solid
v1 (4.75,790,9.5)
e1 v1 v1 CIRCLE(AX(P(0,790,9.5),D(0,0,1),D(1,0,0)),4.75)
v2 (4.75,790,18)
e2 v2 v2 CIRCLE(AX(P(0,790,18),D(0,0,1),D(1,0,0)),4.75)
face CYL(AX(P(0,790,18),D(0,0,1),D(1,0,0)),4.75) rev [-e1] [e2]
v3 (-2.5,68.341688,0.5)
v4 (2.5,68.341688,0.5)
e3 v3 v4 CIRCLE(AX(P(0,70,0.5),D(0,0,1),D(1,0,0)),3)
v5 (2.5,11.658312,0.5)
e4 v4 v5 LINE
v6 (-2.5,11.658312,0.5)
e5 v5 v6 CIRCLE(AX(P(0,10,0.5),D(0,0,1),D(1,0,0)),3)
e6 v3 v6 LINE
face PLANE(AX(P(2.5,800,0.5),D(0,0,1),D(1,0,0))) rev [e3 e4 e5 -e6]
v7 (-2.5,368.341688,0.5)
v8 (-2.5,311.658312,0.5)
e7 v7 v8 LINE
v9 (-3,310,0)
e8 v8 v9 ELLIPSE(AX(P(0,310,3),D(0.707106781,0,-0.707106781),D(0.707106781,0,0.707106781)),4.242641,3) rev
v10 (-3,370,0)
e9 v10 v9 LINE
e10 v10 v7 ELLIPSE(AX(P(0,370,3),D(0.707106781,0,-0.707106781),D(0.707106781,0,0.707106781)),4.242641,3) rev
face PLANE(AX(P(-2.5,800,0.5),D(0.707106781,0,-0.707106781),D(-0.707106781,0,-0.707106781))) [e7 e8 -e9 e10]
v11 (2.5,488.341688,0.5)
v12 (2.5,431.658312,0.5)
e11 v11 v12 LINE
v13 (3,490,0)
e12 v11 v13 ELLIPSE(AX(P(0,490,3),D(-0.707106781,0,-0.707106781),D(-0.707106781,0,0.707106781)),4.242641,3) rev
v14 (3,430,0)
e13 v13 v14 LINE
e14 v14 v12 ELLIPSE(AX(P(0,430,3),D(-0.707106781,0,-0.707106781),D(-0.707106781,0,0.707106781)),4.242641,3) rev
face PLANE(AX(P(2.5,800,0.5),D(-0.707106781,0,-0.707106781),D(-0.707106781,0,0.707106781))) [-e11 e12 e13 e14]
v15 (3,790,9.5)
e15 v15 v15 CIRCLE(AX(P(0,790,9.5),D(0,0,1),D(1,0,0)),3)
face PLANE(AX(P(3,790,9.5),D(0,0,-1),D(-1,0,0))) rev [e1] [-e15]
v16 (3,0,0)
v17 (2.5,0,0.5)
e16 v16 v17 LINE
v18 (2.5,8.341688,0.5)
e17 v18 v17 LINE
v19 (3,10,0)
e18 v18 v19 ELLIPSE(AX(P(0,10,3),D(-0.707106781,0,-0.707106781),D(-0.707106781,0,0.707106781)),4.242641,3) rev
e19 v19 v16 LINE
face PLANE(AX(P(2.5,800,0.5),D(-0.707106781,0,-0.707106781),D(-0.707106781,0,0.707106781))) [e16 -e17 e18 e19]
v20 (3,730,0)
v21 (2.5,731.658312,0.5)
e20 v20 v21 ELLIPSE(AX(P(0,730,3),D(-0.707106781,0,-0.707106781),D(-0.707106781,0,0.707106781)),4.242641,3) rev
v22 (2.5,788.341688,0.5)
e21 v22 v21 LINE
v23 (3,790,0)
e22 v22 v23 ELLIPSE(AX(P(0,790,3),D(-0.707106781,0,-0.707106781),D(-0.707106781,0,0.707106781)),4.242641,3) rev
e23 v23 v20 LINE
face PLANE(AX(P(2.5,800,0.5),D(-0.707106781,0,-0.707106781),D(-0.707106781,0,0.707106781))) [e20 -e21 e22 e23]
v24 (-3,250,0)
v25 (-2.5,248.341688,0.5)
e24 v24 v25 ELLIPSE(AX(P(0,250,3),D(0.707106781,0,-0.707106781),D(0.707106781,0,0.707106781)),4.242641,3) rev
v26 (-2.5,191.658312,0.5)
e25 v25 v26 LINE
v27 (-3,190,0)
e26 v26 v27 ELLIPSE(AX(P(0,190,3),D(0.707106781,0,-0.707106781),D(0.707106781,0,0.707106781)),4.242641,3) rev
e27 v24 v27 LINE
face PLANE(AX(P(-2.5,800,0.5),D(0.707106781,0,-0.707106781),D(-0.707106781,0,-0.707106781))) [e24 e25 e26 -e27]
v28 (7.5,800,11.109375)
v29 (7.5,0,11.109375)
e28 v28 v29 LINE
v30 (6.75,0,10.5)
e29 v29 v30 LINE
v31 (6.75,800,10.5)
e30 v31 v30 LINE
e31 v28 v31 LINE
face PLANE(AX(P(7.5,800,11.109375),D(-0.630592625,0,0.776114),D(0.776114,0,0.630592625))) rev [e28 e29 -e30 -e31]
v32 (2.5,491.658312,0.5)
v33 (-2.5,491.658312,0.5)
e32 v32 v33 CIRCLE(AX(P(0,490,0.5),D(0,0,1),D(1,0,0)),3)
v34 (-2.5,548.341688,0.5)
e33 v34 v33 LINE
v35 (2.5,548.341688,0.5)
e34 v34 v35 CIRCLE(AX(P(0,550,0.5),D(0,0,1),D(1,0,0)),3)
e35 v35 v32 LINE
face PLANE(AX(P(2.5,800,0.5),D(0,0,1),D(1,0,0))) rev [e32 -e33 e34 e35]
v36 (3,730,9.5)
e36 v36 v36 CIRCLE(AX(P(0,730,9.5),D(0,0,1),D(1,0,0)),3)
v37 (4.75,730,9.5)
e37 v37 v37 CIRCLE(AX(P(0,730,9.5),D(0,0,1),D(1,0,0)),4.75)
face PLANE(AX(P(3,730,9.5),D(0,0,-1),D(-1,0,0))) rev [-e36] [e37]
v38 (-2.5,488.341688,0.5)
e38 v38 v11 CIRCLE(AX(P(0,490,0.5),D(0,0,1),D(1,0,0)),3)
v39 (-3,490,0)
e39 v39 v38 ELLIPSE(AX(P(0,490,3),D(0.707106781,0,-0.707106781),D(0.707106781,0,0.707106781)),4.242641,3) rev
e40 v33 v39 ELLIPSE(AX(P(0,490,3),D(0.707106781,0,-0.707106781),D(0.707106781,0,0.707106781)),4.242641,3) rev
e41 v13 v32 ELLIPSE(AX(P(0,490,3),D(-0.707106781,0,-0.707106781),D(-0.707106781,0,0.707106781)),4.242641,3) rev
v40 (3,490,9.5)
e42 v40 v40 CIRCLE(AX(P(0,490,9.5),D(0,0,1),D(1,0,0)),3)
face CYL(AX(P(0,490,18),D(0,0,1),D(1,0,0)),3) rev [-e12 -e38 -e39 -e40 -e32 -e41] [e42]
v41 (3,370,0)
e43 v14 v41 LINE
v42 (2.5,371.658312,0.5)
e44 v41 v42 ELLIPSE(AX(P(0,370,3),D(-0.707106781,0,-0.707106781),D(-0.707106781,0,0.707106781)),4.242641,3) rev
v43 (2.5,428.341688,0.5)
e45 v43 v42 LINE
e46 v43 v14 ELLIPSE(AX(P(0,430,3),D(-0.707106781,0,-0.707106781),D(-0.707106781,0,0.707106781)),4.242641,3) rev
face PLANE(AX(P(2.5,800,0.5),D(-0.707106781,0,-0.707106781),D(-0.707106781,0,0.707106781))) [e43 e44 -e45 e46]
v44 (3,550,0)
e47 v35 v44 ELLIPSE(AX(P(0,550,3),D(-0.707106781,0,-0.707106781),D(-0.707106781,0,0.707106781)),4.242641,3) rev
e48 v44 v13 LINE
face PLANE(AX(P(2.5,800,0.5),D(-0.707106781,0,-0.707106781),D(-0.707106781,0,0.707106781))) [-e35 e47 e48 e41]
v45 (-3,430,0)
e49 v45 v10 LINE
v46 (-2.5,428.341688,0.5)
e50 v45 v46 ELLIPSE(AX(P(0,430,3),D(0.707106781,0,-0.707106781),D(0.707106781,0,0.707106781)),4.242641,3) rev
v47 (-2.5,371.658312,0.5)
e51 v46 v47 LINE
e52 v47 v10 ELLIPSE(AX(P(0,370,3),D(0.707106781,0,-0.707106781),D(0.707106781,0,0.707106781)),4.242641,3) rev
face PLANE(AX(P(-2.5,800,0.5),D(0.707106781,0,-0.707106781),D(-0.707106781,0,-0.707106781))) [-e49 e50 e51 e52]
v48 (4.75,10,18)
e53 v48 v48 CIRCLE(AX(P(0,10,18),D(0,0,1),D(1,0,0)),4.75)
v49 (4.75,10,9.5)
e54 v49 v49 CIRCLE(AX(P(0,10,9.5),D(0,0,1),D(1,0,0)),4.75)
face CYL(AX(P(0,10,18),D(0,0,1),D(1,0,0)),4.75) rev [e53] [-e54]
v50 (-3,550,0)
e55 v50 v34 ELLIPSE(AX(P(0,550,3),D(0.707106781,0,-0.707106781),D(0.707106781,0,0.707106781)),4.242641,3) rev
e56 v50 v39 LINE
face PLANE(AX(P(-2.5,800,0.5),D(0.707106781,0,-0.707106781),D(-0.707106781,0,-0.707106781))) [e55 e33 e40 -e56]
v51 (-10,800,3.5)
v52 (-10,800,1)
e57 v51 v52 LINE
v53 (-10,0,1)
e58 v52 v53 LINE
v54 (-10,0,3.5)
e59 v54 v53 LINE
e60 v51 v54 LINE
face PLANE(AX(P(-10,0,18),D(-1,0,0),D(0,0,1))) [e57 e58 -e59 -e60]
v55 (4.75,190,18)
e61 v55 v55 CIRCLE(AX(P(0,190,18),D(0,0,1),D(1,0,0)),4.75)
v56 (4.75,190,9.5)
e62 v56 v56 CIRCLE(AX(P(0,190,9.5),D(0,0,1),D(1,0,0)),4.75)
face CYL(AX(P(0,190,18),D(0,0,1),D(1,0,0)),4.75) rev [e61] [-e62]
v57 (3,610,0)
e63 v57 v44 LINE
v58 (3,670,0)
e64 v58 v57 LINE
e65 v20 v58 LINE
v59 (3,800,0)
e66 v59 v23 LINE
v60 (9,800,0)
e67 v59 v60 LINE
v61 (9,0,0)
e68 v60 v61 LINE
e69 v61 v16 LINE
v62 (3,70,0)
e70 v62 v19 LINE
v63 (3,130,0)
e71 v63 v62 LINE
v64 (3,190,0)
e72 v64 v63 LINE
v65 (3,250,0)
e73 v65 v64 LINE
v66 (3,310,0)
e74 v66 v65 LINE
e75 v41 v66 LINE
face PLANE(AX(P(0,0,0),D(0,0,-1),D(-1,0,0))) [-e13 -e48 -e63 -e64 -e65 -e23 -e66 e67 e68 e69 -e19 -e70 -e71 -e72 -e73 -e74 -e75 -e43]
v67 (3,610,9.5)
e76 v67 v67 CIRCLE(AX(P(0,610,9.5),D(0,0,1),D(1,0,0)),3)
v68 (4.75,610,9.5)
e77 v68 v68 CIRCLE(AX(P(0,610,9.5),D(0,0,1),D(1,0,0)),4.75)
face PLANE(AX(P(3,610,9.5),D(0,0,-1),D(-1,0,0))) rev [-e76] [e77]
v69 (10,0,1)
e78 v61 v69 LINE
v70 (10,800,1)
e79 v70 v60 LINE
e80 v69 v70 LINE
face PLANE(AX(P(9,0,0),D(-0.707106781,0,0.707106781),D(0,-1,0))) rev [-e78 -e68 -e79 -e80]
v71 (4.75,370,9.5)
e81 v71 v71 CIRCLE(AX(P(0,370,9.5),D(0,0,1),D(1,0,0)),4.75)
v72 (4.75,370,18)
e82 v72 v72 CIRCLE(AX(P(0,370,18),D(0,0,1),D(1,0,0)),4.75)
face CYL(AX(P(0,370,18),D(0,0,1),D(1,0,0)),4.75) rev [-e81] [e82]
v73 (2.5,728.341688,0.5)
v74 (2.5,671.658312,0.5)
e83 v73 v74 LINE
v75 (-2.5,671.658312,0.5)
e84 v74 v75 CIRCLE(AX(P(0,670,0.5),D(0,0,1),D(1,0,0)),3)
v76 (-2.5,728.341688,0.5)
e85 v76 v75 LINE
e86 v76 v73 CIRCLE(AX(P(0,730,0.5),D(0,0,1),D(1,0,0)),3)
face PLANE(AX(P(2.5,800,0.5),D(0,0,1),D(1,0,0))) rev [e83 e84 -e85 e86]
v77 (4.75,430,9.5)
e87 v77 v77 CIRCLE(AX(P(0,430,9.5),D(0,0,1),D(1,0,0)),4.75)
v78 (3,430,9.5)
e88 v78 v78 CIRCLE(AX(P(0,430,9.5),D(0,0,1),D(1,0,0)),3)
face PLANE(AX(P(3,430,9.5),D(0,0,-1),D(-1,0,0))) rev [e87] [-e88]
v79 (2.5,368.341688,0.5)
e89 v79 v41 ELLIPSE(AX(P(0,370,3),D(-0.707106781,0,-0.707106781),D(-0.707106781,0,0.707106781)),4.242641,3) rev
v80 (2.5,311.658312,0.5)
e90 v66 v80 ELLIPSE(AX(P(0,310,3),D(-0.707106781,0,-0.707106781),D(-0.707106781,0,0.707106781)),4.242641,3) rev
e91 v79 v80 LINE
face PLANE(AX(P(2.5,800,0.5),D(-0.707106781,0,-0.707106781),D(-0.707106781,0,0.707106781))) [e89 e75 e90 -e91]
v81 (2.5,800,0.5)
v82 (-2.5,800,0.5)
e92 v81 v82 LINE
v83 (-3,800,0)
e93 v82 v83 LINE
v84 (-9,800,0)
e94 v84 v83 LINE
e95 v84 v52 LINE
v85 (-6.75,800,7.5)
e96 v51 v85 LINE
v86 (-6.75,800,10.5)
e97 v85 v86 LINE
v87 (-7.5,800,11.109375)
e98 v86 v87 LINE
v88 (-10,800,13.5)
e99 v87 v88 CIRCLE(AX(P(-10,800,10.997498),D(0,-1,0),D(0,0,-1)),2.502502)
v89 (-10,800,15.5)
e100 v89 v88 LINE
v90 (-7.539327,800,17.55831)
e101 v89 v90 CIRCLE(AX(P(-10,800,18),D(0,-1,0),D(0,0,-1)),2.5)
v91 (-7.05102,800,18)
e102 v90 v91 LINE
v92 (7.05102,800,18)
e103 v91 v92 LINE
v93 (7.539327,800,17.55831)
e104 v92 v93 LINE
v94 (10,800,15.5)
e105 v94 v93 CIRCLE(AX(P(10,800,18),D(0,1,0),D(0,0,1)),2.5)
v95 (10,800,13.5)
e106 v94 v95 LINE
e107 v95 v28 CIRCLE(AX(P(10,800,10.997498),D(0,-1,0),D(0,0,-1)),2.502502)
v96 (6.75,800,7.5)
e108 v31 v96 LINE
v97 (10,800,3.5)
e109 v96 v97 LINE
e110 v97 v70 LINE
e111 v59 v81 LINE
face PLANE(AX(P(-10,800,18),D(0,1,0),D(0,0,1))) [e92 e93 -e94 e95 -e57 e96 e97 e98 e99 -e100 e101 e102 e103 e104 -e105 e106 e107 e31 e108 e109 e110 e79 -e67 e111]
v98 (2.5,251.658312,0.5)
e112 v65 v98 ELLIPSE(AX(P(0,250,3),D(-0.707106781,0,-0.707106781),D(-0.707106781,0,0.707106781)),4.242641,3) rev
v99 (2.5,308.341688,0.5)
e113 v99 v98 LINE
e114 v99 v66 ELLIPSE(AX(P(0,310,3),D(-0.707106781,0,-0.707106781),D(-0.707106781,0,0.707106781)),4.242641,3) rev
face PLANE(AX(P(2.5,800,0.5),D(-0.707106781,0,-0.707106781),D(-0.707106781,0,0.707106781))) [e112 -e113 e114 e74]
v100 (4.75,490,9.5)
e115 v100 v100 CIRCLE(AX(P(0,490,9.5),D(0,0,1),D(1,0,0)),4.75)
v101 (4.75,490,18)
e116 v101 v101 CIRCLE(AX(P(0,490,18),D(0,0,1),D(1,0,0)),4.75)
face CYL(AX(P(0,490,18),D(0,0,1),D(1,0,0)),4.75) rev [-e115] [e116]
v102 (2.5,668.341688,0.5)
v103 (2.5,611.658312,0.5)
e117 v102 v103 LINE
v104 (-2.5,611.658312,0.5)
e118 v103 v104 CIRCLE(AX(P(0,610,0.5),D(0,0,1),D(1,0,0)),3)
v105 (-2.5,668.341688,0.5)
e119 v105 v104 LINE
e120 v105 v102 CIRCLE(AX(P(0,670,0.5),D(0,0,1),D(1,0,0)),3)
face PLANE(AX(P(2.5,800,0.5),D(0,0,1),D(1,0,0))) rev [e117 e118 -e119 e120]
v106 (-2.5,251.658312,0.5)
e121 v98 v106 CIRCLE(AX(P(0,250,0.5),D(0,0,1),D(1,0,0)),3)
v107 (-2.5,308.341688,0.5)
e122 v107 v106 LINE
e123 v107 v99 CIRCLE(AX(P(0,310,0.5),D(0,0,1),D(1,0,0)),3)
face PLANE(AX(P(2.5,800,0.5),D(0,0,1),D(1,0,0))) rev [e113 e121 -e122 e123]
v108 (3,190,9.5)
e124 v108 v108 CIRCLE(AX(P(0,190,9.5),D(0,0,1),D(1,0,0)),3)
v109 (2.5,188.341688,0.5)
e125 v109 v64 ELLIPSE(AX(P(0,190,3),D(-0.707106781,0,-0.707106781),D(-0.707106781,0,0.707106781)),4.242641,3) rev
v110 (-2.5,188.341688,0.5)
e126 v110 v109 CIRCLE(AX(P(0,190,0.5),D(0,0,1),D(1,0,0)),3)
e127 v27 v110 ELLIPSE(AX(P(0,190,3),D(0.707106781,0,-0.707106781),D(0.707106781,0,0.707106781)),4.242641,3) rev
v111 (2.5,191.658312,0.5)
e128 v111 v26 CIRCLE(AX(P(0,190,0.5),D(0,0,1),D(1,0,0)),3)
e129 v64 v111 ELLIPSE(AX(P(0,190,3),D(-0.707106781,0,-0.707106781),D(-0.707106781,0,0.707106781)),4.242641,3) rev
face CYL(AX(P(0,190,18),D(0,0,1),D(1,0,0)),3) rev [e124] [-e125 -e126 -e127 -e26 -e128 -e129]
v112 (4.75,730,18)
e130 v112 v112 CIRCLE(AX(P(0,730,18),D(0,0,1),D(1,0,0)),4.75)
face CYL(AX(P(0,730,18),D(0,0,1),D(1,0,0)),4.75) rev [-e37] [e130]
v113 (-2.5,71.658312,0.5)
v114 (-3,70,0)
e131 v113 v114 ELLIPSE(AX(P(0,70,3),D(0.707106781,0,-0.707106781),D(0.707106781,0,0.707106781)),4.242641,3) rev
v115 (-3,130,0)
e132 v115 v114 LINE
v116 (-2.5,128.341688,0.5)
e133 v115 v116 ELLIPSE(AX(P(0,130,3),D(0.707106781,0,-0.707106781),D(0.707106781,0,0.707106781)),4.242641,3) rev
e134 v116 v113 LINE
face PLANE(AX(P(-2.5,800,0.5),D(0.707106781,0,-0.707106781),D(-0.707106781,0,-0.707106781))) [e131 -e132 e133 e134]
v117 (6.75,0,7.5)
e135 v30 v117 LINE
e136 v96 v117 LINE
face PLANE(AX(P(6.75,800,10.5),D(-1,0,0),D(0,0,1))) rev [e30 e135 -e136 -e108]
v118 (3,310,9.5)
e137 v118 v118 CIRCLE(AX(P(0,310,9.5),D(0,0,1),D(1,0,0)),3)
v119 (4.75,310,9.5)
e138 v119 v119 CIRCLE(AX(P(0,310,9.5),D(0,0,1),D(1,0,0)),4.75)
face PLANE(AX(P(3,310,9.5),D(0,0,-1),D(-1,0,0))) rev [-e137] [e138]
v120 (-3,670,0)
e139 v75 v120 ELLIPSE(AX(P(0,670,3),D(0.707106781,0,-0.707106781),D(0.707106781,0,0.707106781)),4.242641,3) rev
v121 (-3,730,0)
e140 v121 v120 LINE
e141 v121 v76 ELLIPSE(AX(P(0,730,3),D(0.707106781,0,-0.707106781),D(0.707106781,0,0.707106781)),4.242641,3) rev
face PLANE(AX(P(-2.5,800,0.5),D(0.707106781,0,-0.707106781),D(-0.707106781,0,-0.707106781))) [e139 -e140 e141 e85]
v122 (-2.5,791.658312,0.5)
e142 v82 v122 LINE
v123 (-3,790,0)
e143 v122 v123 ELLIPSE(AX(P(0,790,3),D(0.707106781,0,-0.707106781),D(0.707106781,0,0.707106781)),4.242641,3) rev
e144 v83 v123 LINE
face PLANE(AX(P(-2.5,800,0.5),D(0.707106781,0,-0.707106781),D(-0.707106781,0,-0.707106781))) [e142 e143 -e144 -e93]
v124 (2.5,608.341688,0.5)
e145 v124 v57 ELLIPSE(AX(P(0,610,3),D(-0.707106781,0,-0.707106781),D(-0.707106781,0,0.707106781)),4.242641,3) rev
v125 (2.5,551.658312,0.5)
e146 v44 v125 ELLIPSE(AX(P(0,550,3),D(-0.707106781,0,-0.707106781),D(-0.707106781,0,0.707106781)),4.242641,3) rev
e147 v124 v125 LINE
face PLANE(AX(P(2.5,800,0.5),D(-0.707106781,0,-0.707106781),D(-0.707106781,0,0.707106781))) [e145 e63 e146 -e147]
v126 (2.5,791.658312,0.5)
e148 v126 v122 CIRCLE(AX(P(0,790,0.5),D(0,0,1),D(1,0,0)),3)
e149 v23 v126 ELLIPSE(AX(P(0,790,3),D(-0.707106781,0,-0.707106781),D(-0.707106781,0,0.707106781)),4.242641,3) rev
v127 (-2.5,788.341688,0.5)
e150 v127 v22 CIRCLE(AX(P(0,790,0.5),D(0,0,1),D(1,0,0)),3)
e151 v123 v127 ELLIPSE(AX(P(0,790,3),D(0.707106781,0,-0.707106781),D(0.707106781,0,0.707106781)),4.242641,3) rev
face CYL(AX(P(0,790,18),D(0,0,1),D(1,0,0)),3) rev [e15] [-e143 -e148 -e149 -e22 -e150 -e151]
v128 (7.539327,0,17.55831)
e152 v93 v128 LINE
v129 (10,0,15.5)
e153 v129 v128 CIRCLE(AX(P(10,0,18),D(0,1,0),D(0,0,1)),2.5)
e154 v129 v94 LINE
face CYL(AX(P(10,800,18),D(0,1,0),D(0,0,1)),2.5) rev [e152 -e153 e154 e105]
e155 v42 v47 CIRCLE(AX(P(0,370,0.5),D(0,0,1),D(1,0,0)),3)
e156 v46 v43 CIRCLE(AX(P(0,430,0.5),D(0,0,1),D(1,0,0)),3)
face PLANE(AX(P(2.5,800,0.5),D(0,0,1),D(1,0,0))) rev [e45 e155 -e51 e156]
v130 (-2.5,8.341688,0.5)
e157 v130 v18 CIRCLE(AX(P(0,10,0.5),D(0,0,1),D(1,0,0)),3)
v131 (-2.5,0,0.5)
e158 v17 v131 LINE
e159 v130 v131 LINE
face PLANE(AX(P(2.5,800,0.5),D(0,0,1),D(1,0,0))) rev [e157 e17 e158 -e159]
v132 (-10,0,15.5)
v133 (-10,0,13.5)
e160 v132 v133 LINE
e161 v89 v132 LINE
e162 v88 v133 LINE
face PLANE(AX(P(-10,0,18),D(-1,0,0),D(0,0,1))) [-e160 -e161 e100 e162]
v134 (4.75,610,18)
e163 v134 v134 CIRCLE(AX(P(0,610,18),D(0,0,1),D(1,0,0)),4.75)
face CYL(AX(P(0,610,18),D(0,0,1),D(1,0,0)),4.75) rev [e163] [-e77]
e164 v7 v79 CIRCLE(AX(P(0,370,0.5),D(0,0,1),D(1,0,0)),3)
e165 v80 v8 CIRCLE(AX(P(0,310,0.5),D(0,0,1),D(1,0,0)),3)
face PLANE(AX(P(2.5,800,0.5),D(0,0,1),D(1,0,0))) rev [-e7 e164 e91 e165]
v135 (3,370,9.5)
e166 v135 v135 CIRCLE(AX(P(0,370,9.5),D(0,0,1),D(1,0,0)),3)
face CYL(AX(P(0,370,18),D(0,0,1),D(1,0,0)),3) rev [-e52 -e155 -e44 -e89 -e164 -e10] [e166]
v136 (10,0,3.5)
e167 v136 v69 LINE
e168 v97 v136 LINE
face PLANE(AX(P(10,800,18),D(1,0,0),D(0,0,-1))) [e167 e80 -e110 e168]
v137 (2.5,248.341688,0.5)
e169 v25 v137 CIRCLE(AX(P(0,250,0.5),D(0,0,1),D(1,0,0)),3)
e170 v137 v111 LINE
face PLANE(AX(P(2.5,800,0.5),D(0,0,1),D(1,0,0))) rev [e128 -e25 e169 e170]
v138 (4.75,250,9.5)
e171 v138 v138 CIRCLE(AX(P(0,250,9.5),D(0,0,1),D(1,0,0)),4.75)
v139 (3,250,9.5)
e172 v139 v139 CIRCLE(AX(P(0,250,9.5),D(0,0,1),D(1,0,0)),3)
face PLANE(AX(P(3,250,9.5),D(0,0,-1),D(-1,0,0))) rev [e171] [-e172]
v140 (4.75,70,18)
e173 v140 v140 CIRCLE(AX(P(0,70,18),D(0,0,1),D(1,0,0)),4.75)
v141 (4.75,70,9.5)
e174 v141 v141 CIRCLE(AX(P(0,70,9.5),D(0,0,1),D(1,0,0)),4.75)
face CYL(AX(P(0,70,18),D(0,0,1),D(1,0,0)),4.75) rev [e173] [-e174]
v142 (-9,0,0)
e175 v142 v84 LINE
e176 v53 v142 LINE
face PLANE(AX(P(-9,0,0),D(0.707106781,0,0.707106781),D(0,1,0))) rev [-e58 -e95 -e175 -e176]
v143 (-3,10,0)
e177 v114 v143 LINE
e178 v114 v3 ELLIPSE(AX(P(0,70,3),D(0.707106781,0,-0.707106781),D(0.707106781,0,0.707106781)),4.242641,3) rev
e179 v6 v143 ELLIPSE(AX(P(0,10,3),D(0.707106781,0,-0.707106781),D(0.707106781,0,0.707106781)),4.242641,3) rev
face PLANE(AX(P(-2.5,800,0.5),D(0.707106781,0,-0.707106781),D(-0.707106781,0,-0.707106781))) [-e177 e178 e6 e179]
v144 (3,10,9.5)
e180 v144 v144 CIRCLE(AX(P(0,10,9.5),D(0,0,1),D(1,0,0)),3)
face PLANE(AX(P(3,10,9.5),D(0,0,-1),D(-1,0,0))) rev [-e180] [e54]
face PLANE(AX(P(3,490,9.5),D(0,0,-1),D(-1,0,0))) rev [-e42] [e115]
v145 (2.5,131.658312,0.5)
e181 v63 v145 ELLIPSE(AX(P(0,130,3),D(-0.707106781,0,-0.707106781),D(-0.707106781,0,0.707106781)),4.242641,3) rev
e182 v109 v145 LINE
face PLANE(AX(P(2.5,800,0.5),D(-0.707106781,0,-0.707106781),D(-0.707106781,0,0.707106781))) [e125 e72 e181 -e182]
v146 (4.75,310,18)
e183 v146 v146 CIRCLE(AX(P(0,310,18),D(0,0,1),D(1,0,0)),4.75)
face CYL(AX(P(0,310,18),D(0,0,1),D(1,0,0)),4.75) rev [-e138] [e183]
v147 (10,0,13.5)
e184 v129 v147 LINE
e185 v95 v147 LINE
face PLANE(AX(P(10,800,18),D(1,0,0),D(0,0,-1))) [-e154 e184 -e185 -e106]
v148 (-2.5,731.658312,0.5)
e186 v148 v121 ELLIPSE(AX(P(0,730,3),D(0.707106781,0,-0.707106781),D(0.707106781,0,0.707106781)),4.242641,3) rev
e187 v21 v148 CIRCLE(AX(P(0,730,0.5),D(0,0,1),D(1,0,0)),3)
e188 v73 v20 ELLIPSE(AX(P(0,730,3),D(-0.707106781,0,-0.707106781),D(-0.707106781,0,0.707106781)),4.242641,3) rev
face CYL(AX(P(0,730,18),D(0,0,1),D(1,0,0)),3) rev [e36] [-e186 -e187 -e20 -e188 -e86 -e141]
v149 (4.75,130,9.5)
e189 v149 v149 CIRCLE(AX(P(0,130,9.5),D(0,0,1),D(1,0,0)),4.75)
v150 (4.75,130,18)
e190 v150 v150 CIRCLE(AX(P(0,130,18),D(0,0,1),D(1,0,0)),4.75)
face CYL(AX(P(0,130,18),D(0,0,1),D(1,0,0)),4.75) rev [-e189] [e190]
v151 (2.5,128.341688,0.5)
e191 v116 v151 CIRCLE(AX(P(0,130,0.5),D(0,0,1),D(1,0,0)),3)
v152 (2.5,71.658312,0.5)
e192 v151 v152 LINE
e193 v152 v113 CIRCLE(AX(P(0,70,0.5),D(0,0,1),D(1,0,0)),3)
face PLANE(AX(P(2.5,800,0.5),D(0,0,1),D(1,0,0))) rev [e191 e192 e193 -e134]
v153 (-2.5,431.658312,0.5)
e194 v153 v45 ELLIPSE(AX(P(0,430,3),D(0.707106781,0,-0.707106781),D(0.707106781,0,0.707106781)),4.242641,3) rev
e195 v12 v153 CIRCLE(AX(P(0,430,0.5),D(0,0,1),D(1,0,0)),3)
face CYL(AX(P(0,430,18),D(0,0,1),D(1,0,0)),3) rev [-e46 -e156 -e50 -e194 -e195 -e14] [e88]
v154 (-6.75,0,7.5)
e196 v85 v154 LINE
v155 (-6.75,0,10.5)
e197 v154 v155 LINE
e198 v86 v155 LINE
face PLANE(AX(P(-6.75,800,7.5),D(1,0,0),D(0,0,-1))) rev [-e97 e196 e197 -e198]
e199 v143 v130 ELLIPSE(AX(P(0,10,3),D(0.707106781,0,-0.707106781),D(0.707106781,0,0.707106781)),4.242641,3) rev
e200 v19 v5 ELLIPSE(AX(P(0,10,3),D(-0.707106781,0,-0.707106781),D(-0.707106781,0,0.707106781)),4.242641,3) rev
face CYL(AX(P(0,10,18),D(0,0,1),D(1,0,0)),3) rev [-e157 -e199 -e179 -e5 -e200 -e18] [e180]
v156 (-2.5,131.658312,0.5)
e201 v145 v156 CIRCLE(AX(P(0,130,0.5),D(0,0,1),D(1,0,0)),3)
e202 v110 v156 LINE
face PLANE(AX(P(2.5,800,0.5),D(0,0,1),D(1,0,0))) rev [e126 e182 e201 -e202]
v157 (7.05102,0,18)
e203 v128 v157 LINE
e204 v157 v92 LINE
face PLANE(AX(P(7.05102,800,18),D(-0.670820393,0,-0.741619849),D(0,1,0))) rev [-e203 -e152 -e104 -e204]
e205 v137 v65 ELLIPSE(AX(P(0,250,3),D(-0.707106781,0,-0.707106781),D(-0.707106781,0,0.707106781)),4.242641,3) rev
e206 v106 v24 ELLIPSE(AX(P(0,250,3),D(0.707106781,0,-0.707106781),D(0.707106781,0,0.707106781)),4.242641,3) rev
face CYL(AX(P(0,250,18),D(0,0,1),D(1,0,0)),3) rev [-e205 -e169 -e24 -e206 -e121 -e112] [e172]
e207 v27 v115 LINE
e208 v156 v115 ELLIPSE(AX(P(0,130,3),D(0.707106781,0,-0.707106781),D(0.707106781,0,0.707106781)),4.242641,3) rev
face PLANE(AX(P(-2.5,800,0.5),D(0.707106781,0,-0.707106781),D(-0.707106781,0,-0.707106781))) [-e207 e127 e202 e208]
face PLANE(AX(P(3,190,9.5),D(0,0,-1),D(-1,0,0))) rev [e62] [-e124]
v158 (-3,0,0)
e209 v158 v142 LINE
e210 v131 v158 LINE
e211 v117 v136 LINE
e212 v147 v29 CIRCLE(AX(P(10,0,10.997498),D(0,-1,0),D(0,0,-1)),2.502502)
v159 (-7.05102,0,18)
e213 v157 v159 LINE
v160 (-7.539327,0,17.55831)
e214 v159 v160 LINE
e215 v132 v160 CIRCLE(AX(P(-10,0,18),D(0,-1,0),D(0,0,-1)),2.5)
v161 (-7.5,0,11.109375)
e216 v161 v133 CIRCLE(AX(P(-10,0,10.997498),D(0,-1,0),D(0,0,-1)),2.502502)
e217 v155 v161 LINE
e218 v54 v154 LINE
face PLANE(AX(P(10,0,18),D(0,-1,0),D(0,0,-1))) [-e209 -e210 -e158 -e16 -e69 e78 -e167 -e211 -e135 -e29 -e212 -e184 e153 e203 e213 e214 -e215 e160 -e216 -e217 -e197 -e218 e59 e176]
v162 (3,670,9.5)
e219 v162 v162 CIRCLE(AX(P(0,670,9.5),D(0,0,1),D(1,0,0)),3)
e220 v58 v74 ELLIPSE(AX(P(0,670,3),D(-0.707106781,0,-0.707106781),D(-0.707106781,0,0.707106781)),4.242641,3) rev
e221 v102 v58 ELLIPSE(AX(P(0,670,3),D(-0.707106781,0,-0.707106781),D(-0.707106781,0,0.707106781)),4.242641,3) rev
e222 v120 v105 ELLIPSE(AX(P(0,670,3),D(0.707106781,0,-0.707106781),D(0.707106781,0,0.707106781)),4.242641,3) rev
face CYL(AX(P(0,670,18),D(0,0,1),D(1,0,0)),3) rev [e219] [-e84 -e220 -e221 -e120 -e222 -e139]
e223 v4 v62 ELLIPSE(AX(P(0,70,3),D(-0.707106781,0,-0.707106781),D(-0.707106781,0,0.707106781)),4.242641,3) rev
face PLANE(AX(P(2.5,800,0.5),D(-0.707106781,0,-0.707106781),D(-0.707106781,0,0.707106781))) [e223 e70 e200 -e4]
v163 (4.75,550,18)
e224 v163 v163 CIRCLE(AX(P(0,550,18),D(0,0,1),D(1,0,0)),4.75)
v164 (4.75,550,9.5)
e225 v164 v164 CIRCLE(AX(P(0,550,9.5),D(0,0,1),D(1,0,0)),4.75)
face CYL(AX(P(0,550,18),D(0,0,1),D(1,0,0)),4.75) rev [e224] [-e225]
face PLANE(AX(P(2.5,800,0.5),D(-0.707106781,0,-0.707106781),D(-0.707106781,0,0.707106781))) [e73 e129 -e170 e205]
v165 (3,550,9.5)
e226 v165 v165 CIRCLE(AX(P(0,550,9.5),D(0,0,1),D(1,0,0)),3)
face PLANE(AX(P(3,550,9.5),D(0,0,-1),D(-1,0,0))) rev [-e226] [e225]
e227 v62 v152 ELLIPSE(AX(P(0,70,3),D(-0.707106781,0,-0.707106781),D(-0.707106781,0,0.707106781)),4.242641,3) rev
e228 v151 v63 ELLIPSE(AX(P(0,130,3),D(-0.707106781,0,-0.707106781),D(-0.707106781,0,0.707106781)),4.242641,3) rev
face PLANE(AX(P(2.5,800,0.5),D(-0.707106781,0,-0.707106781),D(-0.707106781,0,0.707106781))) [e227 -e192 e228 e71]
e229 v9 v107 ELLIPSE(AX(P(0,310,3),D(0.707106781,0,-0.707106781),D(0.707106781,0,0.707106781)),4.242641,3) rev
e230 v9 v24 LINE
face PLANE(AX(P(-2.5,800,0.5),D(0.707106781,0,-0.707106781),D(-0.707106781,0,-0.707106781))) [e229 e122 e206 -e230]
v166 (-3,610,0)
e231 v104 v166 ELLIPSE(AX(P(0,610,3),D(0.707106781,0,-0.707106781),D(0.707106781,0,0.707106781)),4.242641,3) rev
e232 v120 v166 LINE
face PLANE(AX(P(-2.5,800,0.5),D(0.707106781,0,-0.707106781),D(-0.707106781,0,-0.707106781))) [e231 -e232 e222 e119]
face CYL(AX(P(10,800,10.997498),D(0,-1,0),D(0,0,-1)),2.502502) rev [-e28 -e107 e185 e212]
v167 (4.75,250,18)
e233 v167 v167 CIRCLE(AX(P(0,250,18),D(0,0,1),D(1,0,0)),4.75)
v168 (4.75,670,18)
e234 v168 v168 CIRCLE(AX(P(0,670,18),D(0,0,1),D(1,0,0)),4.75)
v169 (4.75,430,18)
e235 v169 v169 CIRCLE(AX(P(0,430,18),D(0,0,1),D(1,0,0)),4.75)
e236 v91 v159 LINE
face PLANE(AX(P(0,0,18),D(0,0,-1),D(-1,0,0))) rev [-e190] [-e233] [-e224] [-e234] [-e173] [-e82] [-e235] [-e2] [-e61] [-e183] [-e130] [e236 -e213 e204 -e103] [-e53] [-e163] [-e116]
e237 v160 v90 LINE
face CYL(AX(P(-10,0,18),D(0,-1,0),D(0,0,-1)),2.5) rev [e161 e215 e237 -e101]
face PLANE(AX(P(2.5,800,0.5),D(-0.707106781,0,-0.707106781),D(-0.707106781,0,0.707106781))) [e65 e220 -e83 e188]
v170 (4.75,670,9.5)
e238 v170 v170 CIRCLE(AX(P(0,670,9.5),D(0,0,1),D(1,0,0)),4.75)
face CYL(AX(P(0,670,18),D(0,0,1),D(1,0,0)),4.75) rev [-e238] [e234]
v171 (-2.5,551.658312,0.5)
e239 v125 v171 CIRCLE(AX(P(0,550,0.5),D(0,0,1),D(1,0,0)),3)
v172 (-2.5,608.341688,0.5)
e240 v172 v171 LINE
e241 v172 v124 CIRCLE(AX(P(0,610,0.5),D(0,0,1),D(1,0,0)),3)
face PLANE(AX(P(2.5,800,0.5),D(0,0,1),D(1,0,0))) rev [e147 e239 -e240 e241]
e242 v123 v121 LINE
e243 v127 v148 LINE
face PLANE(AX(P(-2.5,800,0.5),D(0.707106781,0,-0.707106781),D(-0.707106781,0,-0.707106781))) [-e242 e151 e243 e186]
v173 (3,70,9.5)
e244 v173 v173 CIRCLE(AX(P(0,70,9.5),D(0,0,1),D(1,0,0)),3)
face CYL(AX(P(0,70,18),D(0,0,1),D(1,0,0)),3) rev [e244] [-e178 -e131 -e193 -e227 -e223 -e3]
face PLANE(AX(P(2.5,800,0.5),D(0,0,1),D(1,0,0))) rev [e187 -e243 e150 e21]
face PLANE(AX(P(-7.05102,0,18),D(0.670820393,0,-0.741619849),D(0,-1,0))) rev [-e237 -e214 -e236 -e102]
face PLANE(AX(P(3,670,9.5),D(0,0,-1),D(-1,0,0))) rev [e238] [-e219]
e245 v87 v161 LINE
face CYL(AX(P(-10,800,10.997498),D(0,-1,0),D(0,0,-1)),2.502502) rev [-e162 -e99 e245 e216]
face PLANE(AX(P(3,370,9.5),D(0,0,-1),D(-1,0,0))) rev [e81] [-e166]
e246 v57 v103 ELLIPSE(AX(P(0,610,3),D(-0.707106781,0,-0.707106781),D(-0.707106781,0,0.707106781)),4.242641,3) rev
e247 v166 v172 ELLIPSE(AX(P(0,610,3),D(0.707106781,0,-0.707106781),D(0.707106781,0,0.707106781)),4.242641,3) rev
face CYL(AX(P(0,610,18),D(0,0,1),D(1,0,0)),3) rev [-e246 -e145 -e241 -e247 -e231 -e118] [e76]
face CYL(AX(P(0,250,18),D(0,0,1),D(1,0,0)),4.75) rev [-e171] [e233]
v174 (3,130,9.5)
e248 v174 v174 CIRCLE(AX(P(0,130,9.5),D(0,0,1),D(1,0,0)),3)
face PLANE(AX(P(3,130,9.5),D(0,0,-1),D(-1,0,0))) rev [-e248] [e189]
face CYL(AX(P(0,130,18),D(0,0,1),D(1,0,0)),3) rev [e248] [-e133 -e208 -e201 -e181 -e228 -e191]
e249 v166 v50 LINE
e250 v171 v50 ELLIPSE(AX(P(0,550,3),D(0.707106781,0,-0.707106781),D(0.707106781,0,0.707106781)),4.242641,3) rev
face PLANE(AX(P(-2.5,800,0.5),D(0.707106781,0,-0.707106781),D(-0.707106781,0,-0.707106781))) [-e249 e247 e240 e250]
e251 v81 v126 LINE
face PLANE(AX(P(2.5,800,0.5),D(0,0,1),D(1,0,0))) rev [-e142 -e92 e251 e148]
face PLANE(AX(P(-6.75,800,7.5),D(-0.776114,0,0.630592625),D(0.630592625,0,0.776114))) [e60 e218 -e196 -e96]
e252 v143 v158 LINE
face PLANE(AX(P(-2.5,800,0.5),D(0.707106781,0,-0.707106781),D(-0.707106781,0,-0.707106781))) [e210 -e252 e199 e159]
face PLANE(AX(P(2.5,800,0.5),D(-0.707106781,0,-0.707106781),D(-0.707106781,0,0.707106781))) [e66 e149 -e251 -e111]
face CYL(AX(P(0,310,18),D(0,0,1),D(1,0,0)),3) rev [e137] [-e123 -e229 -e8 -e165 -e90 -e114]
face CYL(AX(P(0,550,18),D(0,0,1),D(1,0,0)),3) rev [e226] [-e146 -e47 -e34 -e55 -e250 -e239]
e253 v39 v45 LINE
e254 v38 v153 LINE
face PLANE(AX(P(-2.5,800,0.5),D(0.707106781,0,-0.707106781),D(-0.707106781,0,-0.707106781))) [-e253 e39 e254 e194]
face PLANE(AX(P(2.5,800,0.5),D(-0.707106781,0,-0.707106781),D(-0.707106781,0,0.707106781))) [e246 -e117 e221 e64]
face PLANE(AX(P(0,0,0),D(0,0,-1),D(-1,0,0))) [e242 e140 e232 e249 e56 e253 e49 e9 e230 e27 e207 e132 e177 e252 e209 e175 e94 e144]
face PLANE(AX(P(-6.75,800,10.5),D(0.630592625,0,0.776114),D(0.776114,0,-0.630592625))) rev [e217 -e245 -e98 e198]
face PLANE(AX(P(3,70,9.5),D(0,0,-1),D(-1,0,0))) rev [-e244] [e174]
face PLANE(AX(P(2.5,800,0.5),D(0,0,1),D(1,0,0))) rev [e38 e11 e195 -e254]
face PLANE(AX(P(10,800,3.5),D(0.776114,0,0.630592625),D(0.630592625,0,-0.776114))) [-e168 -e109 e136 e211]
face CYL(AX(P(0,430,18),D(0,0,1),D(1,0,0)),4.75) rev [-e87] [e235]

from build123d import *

# Parameters (mm, degrees)
SKIZZE1_W                       = 20
SKIZZE1_H                       = 800
AUFSATZ_LINEAR_AUSTRAGEN1_DEPTH = 18
SKIZZE2_W                       = 5
SKIZZE2_H                       = 0.5
SCHNITT_LINEAR_AUSTRAGEN1_DEPTH = 801.264956124
SCHNITT_LINEAR_AUSTRAGEN2_DEPTH = 801.264956124
SCHNITT_LINEAR_AUSTRAGEN3_DEPTH = 801.264956124
FORMSCHR_GE1_ANGLE              = 50.906141114
FORMSCHR_GE2_ANGLE              = 50.906141114
FORMSCHR_GE3_ANGLE              = 45
F_5_0_5_DURCHMESSER_BOHRUNG1_D  = 5
F_5_0_5_DURCHMESSER_BOHRUNG2_D  = 5
BOHRUNG1_D                      = 6
BOHRUNG1_DEPTH                  = 18
BOHRUNG1_CBORE_D                = 9.5
BOHRUNG1_CBORE_DEPTH            = 8.5
FASE1_SIZE                      = 1
FASE2_SIZE                      = 0.448979592


with BuildPart() as part:
    # Skizze1 → Aufsatz-Linear austragen1 (new body)
    with BuildSketch(Plane(origin=(0, 0, 0), x_dir=(-1, 0, 0), z_dir=(0, 0, -1))):
        with Locations((0, 400)):
            Rectangle(SKIZZE1_W, SKIZZE1_H)
    extrude(amount=-AUFSATZ_LINEAR_AUSTRAGEN1_DEPTH)

    # Skizze2 → Schnitt-Linear austragen1 (cut, through all)
    with BuildSketch(Plane.XZ):
        with Locations((0, 0.25)):
            Rectangle(SKIZZE2_W, SKIZZE2_H)
    extrude(amount=-SCHNITT_LINEAR_AUSTRAGEN1_DEPTH, mode=Mode.SUBTRACT)

    # Skizze3 → Schnitt-Linear austragen2 (cut, through all)
    with BuildSketch(Plane.XZ):
        with BuildLine():
            Line((-10, 13.5), (-10, 7.5))
            Line((-10, 7.5), (-6.75, 7.5))
            Line((-6.75, 7.5), (-6.75, 10.5))
            Line((-6.75, 10.5), (-7.5, 11.109375))
            ThreePointArc((-7.5, 11.109375), (-8.270470592, 12.806156162), (-10, 13.5))
        make_face()
    extrude(amount=-SCHNITT_LINEAR_AUSTRAGEN2_DEPTH, mode=Mode.SUBTRACT)

    # Skizze4 → Schnitt-Linear austragen3 (cut, through all)
    with BuildSketch(Plane.XZ):
        with BuildLine():
            Line((7.5, 11.109375), (6.75, 10.5))
            Line((6.75, 10.5), (6.75, 3.5))
            Line((6.75, 3.5), (10, 3.5))
            Line((10, 3.5), (10, 13.5))
            ThreePointArc((10, 13.5), (8.270470592, 12.806156162), (7.5, 11.109375))
        make_face()
    extrude(amount=-SCHNITT_LINEAR_AUSTRAGEN3_DEPTH, mode=Mode.SUBTRACT)

    # Formschräge1
    formschr_ge1_faces = [part.faces().sort_by_distance(p)[0] for p in [
        (8.375, 400, 3.5),
    ]]
    draft(formschr_ge1_faces, Plane(origin=(10, 800, 18), x_dir=(0, 0, 1), z_dir=(1, 0, 0)), FORMSCHR_GE1_ANGLE)

    # Formschräge2
    formschr_ge2_faces = [part.faces().sort_by_distance(p)[0] for p in [
        (-8.375, 400, 7.5),
    ]]
    draft(formschr_ge2_faces, Plane(origin=(-6.75, 800, 7.5), x_dir=(0, 0, -1), z_dir=(-1, 0, 0)), FORMSCHR_GE2_ANGLE)

    # Formschräge3
    formschr_ge3_faces = [part.faces().sort_by_distance(p)[0] for p in [
        (2.5, 400, 0.25),
        (-2.5, 400, 0.25),
    ]]
    draft(formschr_ge3_faces, Plane(origin=(2.5, 800, 0.5), x_dir=(-1, 0, 0), z_dir=(0, 0, -1)), FORMSCHR_GE3_ANGLE)

    # Ø5.0 (5) Durchmesser Bohrung1 (through all)
    with Locations(Plane(origin=(0, 800, 0), x_dir=(1, 0, 0), z_dir=(0, 1, 0))):
        with Locations((10, -18)):
            Hole(F_5_0_5_DURCHMESSER_BOHRUNG1_D / 2)

    # Ø5.0 (5) Durchmesser Bohrung2 (through all)
    with Locations(Plane(origin=(0, 0, 0), x_dir=(-1, 0, 0), z_dir=(0, -1, 0))):
        with Locations((10, -18)):
            Hole(F_5_0_5_DURCHMESSER_BOHRUNG2_D / 2)

    # Bohrung1
    with Locations(Plane.XY.offset(18)):
        with Locations((0, 790), (0, 730), (0, 670), (0, 610), (0, 550), (0, 490), (0, 430), (0, 370), (0, 310), (0, 250), (0, 190), (0, 130), (0, 70), (0, 10)):
            CounterBoreHole(BOHRUNG1_D / 2, BOHRUNG1_CBORE_D / 2, BOHRUNG1_CBORE_DEPTH, depth=BOHRUNG1_DEPTH)

    # Fase1
    fase1_edges = [part.edges().sort_by_distance(p)[0] for p in [
        (-10, 400, 0),
        (10, 400, 0),
    ]]
    chamfer(fase1_edges, length=FASE1_SIZE)

    # Fase2
    # the kernel refuses this chamfer: 0.448979592, 0.406117321 mm, written as the material it takes off along each edge
    with BuildSketch(Plane(origin=(7.5, 801.156138571, 18), x_dir=(0.08868753028202897, 0, -0.9960594972050988), z_dir=(0, -1, 0))) as fase2_piece_1:
        with BuildLine():
            Line((0.443437651, 0), (-FASE2_SIZE * 0.0886875302498, -FASE2_SIZE * 0.996059496843))
            Line((-FASE2_SIZE * 0.0886875302498, -FASE2_SIZE * 0.996059496843), (0, 0))
            ThreePointArc((0, 0), (0.228351687, -0.009842458), (0.443437651, 0))
        make_face()
    extrude(amount=802.312277141, mode=Mode.SUBTRACT)
    with BuildSketch(Plane(origin=(-7.5, -1.156138571, 18), x_dir=(1, 0, 0), z_dir=(0, 1, 0))) as fase2_piece_2:
        with BuildLine():
            Line((FASE2_SIZE, 0), (-0.03932739, 0.441690284))
            ThreePointArc((-0.03932739, 0.441690284), (-0.010448273, 0.22832477), (0, 0))
            Line((0, 0), (FASE2_SIZE, 0))
        make_face()
    extrude(amount=802.312277141, mode=Mode.SUBTRACT)


solid = part.part
